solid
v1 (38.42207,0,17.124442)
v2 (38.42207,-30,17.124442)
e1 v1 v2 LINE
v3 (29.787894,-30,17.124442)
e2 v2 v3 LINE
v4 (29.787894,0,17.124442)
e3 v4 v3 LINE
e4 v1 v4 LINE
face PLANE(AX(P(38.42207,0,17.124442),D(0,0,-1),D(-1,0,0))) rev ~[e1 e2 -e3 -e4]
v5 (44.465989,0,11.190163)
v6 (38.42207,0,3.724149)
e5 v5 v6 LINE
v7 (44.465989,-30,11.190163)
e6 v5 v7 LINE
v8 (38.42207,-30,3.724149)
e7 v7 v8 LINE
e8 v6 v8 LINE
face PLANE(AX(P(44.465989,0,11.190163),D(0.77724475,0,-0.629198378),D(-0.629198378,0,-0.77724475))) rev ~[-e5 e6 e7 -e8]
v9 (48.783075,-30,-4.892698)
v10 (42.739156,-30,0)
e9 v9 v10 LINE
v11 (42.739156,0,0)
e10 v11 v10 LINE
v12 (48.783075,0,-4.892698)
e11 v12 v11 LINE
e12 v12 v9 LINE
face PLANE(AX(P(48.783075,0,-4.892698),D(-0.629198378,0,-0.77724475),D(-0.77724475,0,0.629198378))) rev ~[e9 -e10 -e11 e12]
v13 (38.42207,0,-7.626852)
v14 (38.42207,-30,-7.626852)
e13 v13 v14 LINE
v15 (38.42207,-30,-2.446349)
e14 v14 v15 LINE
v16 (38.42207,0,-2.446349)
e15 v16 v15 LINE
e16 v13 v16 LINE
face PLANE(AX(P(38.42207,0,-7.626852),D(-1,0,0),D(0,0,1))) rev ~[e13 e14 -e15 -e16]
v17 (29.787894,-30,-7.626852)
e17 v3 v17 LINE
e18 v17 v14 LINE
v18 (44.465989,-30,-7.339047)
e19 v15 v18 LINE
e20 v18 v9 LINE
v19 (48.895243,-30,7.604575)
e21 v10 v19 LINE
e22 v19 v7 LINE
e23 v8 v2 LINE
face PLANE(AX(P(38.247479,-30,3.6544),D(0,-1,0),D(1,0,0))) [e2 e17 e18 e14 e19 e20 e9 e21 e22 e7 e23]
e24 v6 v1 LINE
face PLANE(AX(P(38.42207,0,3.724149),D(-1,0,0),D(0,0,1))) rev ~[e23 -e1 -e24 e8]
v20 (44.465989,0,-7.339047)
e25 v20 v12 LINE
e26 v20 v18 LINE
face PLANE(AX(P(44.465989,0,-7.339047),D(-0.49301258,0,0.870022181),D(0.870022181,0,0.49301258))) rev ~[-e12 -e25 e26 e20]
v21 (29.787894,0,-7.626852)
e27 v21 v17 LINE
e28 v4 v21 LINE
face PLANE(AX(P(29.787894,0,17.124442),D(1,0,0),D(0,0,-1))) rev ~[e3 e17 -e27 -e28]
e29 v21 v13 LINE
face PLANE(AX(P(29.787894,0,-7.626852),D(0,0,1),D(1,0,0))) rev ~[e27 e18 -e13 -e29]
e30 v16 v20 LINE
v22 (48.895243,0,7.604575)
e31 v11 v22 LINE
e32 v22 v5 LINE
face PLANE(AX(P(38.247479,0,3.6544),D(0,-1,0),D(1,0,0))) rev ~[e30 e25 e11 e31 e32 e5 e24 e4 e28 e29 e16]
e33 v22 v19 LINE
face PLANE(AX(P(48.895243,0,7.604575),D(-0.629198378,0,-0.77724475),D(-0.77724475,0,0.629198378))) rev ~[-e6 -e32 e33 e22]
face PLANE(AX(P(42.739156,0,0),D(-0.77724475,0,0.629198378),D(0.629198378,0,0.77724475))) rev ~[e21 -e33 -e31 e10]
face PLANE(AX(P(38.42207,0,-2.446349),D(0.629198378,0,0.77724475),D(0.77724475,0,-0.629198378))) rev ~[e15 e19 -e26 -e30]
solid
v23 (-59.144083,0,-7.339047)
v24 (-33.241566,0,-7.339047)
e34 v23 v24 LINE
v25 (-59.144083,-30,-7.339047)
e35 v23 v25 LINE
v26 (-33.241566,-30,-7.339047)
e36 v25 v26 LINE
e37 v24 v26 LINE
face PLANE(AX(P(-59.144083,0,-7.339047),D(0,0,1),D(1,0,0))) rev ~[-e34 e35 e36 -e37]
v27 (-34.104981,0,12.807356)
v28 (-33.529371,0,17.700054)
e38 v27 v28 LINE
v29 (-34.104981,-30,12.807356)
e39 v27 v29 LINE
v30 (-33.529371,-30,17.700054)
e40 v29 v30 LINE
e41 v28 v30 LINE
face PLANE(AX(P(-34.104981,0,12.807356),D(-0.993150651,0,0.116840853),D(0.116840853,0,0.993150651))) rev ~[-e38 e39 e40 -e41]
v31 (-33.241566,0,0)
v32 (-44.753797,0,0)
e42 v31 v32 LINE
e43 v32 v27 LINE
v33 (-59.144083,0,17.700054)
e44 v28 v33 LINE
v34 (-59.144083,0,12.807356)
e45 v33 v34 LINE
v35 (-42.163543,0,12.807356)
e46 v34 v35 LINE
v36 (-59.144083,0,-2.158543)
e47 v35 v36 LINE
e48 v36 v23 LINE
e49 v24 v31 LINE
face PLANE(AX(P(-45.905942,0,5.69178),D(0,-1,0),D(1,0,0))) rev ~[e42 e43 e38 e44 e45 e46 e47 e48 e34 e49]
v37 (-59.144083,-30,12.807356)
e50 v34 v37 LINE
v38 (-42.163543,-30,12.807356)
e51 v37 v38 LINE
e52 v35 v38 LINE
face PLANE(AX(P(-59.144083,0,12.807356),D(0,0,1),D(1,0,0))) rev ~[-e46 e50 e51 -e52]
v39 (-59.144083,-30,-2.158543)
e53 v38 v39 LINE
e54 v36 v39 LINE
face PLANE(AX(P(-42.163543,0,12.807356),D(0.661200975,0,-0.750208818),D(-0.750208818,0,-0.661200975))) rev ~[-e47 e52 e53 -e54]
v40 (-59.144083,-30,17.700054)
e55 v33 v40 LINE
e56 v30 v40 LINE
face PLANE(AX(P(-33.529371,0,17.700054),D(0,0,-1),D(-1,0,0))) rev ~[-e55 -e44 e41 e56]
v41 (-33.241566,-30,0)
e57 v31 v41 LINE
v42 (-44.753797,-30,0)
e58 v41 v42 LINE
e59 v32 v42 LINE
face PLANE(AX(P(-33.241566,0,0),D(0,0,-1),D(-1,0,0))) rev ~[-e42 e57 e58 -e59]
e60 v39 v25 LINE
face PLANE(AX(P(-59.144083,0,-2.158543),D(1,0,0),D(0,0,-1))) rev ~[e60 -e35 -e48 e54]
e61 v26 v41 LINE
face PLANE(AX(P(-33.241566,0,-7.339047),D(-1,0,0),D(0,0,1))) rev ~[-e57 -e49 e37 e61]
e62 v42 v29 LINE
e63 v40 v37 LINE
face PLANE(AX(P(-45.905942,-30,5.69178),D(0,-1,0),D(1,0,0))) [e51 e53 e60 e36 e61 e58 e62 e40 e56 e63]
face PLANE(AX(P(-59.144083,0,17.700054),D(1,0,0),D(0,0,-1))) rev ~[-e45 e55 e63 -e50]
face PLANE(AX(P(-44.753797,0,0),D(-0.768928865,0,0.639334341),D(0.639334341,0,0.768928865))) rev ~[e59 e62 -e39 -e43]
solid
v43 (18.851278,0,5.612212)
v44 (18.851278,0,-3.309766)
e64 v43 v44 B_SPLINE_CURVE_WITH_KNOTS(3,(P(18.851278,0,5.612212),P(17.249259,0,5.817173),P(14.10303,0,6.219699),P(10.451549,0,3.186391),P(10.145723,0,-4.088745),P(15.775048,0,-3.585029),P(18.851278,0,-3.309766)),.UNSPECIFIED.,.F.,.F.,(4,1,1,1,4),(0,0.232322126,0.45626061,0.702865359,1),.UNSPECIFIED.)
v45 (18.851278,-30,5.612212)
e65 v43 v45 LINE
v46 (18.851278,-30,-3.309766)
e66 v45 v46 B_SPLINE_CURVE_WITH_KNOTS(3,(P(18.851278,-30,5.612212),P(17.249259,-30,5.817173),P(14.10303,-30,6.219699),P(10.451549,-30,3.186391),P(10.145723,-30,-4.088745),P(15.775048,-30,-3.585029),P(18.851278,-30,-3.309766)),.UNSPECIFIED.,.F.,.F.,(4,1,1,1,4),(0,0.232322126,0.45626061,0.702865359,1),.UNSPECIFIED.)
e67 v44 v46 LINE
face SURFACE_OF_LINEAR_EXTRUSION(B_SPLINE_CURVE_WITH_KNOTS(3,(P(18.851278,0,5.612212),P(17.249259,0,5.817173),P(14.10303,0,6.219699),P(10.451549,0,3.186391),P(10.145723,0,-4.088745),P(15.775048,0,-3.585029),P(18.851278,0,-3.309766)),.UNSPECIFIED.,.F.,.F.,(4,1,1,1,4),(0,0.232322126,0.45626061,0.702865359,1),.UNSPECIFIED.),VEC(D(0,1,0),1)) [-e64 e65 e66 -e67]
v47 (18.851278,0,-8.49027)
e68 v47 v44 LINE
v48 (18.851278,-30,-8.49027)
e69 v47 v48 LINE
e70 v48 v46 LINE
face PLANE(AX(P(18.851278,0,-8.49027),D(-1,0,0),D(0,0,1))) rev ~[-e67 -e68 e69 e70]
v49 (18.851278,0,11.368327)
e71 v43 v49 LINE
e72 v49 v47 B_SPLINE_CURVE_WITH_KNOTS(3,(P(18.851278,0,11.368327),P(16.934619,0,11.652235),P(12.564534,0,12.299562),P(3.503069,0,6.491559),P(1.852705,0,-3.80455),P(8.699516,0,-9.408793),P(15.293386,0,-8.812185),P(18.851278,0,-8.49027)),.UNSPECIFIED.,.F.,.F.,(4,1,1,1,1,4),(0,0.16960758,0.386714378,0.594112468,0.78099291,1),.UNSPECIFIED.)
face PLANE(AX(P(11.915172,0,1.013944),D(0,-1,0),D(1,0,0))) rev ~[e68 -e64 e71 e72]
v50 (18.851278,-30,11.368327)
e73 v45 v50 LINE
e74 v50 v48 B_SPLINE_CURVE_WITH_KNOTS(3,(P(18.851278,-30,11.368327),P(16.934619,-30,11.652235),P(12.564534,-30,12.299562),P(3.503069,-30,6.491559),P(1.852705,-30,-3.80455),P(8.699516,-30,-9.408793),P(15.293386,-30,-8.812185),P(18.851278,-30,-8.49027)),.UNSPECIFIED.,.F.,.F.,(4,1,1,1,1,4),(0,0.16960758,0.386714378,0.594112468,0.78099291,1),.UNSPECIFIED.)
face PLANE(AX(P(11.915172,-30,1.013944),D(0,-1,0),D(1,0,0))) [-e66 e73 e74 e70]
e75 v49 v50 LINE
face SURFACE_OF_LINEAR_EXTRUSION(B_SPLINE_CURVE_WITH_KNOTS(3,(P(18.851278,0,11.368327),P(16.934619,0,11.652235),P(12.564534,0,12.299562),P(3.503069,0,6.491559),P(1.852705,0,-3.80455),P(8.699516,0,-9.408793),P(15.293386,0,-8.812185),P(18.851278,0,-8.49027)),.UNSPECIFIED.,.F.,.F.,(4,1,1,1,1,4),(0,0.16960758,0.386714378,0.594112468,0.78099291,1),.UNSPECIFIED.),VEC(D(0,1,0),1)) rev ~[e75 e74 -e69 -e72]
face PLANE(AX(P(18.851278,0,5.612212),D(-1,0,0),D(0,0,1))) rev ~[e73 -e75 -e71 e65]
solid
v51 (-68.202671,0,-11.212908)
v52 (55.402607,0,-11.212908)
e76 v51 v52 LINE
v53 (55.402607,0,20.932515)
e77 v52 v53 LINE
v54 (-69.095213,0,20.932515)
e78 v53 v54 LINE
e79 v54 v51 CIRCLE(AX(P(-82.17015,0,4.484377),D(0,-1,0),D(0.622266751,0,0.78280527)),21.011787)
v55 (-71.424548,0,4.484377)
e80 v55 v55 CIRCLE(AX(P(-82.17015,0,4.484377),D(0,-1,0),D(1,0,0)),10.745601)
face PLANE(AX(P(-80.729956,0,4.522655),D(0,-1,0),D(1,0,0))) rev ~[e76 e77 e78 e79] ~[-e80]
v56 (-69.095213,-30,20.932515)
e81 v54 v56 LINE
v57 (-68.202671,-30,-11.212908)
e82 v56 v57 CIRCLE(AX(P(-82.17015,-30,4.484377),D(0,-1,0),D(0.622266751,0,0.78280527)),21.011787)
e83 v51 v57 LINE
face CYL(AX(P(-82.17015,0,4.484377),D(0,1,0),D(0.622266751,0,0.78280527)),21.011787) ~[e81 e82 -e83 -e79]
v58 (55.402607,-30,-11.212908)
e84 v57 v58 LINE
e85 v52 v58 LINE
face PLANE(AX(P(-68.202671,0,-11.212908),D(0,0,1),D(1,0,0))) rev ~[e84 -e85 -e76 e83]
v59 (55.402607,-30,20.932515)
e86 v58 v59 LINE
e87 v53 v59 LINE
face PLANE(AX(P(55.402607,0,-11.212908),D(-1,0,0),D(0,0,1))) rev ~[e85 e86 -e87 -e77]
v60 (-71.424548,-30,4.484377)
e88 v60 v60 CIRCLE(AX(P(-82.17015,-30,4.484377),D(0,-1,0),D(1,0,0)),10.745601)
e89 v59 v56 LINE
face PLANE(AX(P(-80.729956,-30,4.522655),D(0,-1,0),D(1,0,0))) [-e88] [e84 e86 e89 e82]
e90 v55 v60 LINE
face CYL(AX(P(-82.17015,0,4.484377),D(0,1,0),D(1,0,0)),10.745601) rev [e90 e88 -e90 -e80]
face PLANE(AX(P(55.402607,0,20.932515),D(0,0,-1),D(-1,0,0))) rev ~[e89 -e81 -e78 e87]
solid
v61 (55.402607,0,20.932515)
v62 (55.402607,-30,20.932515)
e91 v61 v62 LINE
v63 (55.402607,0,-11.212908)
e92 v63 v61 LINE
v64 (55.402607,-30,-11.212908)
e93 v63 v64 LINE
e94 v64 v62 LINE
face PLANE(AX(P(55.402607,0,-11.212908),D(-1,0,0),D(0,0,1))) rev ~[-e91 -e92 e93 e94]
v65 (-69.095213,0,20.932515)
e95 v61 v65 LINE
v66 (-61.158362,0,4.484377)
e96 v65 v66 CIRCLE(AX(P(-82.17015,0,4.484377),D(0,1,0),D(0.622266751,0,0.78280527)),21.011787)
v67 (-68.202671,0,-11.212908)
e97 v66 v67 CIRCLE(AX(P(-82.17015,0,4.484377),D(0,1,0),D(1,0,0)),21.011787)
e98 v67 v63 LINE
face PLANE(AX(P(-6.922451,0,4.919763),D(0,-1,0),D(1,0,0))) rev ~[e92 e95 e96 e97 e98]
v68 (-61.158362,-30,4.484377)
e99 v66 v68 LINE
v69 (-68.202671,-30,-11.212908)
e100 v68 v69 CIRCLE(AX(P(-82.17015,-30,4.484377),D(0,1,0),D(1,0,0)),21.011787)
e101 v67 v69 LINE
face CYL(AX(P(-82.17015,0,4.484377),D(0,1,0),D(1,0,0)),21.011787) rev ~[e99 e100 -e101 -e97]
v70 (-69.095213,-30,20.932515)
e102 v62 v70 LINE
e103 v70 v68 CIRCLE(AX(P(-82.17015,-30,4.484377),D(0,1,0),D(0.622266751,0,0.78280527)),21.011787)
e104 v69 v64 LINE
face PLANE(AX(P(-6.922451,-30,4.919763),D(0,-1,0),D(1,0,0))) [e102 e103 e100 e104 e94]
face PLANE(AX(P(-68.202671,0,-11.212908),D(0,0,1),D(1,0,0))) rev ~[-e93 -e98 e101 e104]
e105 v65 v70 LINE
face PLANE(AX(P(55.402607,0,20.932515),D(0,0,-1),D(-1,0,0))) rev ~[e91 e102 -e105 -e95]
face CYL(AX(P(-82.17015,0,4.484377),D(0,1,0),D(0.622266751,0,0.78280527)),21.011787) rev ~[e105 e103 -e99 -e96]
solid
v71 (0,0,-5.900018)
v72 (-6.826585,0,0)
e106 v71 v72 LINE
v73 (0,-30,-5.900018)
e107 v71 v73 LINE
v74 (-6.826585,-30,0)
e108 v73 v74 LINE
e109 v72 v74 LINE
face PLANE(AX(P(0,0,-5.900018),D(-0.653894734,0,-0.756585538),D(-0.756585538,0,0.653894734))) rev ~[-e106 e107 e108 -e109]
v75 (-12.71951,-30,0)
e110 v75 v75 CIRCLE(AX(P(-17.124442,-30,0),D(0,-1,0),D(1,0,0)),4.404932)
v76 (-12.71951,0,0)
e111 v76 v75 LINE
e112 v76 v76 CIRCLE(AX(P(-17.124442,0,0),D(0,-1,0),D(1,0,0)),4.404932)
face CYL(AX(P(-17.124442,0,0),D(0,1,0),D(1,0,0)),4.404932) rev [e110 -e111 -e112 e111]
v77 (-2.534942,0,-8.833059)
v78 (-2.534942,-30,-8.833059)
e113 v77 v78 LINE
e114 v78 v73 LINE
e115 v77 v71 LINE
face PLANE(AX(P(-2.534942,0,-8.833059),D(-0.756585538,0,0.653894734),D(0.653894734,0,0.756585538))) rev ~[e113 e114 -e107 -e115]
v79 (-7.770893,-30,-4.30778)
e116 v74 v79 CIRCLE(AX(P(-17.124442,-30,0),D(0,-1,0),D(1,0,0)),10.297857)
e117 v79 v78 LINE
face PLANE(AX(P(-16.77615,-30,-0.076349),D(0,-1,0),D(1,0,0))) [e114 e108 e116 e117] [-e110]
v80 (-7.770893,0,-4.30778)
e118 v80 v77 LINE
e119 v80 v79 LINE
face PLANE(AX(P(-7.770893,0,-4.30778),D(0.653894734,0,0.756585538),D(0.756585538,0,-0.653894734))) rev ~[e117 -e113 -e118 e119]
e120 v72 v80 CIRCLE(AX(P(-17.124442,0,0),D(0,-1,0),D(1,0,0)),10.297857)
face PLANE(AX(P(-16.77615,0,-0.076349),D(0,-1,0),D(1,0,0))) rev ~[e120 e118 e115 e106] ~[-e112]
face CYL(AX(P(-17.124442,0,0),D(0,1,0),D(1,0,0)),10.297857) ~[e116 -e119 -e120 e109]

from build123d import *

# Parameters (mm, degrees)
F2_DEPTH = 30
F1_R     = 4.4049320067
F0_R     = 10.7456012025
F3_DEPTH = 30


with BuildPart() as f2:
    # F1 (on face) → F2 (new body)
    with BuildSketch(Plane.XZ):
        Polygon((-33.5293710232, 17.7000537515), (-59.1440834105, 17.7000537515), (-59.1440834105, 12.8073561937), (-42.1635434031, 12.8073561937), (-59.1440834105, -2.158543095), (-59.1440834105, -7.3390468024), (-33.2415662706, -7.3390468024), (-33.2415662706, 0), (-44.7537973523, 0), (-34.1049805284, 12.8073561937), align=None)
    extrude(amount=F2_DEPTH)


with BuildPart() as f2b:
    # F1 (on face) → F2, piece 2 (new body)
    with BuildSketch(Plane.XZ):
        with BuildLine():
            ThreePointArc((-7.7708927198, -4.3077798834), (-7.0654321008, -2.2050330991), (-6.8265853814, 0))
            ThreePointArc((-6.8265853814, 0), (-27.1834526665, 2.2050330991), (-7.7708927198, -4.3077798834))
        make_face()
        with Locations((-17.1244423836, 0)):
            Circle(F1_R, mode=Mode.SUBTRACT)
        with BuildLine():
            Line((0, -5.9000179172), (-6.8265853814, 0))
            ThreePointArc((-6.8265853814, 0), (-7.0654321008, -2.2050330991), (-7.7708927198, -4.3077798834))
            Line((-7.7708927198, -4.3077798834), (-2.5349416562, -8.8330591208))
            Line((-2.5349416562, -8.8330591208), (0, -5.9000179172))
        make_face()
    extrude(amount=F2_DEPTH)


with BuildPart() as f2c:
    # F1 (on face) → F2, piece 3 (new body)
    with BuildSketch(Plane.XZ):
        with BuildLine():
            Line((18.8512783498, 5.6122122332), (18.8512783498, 11.3683268428))
            add(Edge.make_bspline(
                [(18.8512783498, 11.3683268428), (16.934619478, 11.6522354863), (12.5645344654, 12.2995624187), (3.503068807, 6.4915593774), (1.8527053529, -3.8045495423), (8.6995157805, -9.4087929989), (15.2933857079, -8.8121851572), (18.8512783498, -8.4902700037)],
                knots=[0, 0, 0, 0, 0.1696075799, 0.3867143778, 0.5941124684, 0.7809929104, 1, 1, 1, 1], degree=3))
            Line((18.8512783498, -8.4902700037), (18.8512783498, -3.3097660635))
            add(Edge.make_bspline(
                [(18.8512783498, 5.6122122332), (17.2492587339, 5.8171733652), (14.1030304305, 6.2196993442), (10.4515493069, 3.186391092), (10.1457232334, -4.0887450053), (15.7750482612, -3.5850292061), (18.8512783498, -3.3097660635)],
                knots=[0, 0, 0, 0, 0.2323221255, 0.4562606098, 0.7028653588, 1, 1, 1, 1], degree=3))
        make_face()
    extrude(amount=F2_DEPTH)


with BuildPart() as f2d:
    # F1 (on face) → F2, piece 4 (new body)
    with BuildSketch(Plane.XZ):
        Polygon((38.4220704436, 17.1244423836), (29.7878943384, 17.1244423836), (29.7878943384, -7.6268524863), (38.4220704436, -7.6268524863), (38.4220704436, -2.4463490117), (44.4659888744, -7.3390468024), (48.7830750644, -4.8926979071), (42.7391564898, 0), (48.8952434361, 7.6045750113), (44.4659888744, 11.1901634431), (38.4220704436, 3.7241494849), align=None)
    extrude(amount=F2_DEPTH)


with BuildPart() as f2e:
    # F0 (on Front) → F2, piece 5 (new body)
    with BuildSketch(Plane.XZ):
        with BuildLine():
            ThreePointArc((-69.0952130065, 20.9325148778), (-63.2463155324, 13.6158451119), (-61.1583623106, 4.4843770224))
            ThreePointArc((-61.1583623106, 4.4843770224), (-63.0001614839, -4.1183412047), (-68.2026712705, -11.2129079295))
            Line((-68.2026712705, -11.2129079295), (55.4026070849, -11.2129079295))
            Line((55.4026070849, -11.2129079295), (55.4026070849, 20.9325148778))
            Line((55.4026070849, 20.9325148778), (-69.0952130065, 20.9325148778))
        make_face()
    extrude(amount=F2_DEPTH)


with BuildPart() as f3:
    # F0 (on Front) → F3 (new body)
    with BuildSketch(Plane.XZ):
        with BuildLine():
            ThreePointArc((-68.2026712705, -11.2129079295), (-63.0001614839, -4.1183412047), (-61.1583623106, 4.4843770224))
            ThreePointArc((-61.1583623106, 4.4843770224), (-63.2463155324, 13.6158451119), (-69.0952130065, 20.9325148778))
            ThreePointArc((-69.0952130065, 20.9325148778), (-103.1738422822, 3.901193768), (-68.2026712705, -11.2129079295))
        make_face()
        with Locations((-82.1701496464, 4.4843770224)):
            Circle(F0_R, mode=Mode.SUBTRACT)
        with BuildLine():
            ThreePointArc((-69.0952130065, 20.9325148778), (-63.2463155324, 13.6158451119), (-61.1583623106, 4.4843770224))
            ThreePointArc((-61.1583623106, 4.4843770224), (-63.0001614839, -4.1183412047), (-68.2026712705, -11.2129079295))
            Line((-68.2026712705, -11.2129079295), (55.4026070849, -11.2129079295))
            Line((55.4026070849, -11.2129079295), (55.4026070849, 20.9325148778))
            Line((55.4026070849, 20.9325148778), (-69.0952130065, 20.9325148778))
        make_face()
    extrude(amount=F3_DEPTH)


solid = Compound([f2.part, f2b.part, f2c.part, f2d.part, f2e.part, f3.part])
